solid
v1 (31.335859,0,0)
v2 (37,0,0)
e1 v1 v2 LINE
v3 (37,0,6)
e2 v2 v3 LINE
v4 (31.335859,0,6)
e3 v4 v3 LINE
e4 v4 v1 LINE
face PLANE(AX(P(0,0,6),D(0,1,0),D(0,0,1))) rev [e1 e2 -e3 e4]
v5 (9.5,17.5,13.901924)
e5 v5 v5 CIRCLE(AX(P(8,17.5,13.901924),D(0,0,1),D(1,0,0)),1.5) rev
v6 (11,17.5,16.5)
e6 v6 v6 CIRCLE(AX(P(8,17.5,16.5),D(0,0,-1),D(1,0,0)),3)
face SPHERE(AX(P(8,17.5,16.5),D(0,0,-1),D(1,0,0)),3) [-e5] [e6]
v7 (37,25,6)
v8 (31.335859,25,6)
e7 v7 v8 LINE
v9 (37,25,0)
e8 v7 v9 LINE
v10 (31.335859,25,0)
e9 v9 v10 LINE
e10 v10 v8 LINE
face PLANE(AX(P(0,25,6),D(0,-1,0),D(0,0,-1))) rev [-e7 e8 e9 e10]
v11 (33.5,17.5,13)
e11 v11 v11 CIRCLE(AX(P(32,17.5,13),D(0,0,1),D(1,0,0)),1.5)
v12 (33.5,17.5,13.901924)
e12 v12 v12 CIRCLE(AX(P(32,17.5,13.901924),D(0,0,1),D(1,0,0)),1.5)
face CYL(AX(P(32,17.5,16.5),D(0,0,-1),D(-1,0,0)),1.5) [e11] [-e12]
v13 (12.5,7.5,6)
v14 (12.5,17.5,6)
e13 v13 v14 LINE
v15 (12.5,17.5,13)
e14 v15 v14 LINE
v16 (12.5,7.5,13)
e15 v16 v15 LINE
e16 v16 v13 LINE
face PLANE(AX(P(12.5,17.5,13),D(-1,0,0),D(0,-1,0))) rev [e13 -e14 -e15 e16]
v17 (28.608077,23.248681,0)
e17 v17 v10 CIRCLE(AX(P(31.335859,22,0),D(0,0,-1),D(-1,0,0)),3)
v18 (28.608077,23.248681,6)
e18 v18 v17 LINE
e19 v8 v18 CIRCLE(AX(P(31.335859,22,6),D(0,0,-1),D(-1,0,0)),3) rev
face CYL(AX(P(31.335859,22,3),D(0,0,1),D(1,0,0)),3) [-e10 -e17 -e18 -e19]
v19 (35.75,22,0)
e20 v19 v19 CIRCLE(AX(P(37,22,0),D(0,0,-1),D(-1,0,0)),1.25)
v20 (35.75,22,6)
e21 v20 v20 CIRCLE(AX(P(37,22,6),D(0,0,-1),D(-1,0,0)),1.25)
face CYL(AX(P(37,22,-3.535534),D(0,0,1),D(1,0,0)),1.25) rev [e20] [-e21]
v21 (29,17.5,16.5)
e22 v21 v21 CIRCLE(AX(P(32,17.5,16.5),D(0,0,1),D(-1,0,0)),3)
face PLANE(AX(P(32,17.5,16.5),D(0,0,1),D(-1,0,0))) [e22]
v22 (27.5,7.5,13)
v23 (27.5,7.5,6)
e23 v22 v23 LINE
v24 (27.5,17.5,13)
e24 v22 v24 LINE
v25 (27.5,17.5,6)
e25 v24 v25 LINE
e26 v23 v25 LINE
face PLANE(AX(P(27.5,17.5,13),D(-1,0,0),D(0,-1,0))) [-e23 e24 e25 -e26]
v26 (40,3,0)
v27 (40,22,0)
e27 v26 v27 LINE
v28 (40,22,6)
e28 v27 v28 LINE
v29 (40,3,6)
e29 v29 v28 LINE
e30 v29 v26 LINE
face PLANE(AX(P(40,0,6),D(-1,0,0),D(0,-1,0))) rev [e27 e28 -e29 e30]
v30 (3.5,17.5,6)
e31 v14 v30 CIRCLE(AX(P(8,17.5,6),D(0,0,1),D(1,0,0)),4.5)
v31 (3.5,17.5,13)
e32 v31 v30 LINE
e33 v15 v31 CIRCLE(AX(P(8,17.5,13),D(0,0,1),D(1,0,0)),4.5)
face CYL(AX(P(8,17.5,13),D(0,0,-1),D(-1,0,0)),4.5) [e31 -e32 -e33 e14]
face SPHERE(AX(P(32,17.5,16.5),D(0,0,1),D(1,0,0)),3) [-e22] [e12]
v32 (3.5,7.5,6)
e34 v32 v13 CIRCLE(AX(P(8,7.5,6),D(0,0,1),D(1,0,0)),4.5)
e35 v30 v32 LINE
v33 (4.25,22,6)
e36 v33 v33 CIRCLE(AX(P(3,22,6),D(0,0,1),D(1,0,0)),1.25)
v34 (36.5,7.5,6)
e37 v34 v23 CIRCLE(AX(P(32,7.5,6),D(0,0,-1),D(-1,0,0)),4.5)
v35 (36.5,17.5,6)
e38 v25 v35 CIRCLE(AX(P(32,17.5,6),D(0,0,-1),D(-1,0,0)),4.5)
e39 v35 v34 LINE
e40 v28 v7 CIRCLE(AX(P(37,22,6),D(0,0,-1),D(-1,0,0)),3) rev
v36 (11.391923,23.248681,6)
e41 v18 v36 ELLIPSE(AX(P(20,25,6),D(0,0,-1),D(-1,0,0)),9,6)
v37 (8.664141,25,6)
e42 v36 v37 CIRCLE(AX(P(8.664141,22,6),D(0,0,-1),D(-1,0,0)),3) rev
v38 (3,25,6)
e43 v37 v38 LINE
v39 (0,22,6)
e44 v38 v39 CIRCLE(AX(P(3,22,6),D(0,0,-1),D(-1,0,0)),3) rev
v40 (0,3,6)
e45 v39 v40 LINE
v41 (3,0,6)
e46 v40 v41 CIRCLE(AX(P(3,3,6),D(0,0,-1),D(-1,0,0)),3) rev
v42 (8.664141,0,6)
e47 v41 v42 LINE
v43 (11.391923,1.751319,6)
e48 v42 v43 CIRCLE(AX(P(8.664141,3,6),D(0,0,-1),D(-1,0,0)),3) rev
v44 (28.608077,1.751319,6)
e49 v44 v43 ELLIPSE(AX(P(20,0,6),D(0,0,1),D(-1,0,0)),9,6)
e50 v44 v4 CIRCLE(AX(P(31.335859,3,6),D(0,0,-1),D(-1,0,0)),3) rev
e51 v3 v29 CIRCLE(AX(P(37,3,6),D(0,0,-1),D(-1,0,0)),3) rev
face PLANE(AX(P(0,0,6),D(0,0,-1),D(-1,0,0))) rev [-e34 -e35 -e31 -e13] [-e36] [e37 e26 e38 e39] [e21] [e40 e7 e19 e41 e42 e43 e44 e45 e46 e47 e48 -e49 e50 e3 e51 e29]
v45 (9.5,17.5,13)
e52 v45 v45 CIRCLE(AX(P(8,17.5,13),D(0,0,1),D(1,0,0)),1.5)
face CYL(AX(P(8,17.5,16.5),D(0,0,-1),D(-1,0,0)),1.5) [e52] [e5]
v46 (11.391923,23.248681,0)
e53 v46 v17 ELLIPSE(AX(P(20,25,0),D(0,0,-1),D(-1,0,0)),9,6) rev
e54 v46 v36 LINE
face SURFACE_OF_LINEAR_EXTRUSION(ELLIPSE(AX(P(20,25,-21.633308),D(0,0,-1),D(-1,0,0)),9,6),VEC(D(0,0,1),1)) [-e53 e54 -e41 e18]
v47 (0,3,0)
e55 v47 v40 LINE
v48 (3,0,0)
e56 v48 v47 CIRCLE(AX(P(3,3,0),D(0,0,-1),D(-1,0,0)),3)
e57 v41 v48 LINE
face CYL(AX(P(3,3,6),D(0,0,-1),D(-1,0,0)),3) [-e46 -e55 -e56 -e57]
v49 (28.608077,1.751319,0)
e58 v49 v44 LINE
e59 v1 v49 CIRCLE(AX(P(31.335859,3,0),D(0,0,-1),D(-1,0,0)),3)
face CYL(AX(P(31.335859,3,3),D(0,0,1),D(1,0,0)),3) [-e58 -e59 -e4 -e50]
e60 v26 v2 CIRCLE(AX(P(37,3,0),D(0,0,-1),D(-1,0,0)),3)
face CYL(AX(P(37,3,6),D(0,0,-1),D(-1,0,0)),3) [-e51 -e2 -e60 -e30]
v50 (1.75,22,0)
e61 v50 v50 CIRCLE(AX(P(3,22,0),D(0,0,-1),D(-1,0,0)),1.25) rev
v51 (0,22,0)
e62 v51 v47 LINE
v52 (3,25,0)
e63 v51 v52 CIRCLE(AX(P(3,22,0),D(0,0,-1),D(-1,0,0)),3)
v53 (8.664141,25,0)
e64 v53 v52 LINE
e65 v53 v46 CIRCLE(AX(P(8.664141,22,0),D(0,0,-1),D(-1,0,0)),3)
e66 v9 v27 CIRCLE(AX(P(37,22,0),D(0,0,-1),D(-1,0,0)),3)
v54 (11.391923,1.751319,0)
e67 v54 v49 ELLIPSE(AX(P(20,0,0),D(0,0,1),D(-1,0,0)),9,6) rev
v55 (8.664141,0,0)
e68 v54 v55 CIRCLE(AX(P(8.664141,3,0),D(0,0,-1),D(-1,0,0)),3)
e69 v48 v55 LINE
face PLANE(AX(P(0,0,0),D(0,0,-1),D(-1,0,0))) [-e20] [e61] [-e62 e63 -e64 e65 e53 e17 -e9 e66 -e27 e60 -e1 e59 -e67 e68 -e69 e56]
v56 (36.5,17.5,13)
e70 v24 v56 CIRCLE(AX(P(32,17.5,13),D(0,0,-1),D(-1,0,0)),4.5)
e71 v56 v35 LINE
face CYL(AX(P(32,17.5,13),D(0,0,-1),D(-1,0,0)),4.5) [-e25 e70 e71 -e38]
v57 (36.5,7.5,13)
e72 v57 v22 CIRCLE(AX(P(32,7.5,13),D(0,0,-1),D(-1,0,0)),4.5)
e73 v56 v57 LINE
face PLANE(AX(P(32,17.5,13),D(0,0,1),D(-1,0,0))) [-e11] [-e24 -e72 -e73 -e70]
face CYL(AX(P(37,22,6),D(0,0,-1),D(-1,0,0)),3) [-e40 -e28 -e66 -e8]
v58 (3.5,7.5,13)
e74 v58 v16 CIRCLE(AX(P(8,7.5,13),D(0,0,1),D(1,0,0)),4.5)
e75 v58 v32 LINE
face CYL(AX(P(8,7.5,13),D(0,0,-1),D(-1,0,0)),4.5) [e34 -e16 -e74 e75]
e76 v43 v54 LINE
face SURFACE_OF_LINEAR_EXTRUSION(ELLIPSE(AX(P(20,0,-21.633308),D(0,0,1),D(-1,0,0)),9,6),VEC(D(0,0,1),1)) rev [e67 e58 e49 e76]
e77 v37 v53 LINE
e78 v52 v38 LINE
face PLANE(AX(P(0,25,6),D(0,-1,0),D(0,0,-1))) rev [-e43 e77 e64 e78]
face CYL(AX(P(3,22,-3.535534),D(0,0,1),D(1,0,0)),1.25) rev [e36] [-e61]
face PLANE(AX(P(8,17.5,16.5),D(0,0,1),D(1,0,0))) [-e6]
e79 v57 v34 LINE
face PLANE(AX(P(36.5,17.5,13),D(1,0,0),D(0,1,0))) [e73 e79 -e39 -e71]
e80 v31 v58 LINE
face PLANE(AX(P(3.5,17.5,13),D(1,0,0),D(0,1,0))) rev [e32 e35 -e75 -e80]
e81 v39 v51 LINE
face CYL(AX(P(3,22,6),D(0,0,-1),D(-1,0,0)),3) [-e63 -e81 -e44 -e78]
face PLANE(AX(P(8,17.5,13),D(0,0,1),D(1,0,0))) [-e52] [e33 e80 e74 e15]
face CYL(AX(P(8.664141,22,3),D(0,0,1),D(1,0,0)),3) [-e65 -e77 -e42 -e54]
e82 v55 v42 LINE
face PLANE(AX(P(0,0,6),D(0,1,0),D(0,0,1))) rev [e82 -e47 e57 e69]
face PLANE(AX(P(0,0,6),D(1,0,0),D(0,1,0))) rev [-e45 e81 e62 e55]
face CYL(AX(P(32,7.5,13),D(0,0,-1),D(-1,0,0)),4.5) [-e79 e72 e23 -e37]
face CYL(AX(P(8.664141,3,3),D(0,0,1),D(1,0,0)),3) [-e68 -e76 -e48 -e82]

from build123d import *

# Parameters (mm, degrees)
SKIZZE1_W                       = 40
SKIZZE1_H                       = 25
AUFSATZ_LINEAR_AUSTRAGEN1_DEPTH = 6
AUFSATZ_LINEAR_AUSTRAGEN2_DEPTH = 7
SKIZZE3_R                       = 1.5
AUFSATZ_LINEAR_AUSTRAGEN3_DEPTH = 3.5
ROTATION1_ANGLE                 = 180
VERRUNDUNG1_R                   = 3
SKIZZE6_RX                      = 9
SKIZZE6_RY                      = 6
SCHNITT_LINEAR_AUSTRAGEN7_DEPTH = 6
VERRUNDUNG2_START               = -1
VERRUNDUNG2_DEPTH               = 8
VERRUNDUNG3_START               = -1
VERRUNDUNG3_DEPTH               = 8
SKIZZE7_R                       = 1.25
SCHNITT_LINEAR_AUSTRAGEN8_DEPTH = 6


with BuildPart() as part:
    # Skizze1 → Aufsatz-Linear austragen1 (new body)
    with BuildSketch(Plane.XY):
        with Locations((20, 12.5)):
            Rectangle(SKIZZE1_W, SKIZZE1_H)
    extrude(amount=AUFSATZ_LINEAR_AUSTRAGEN1_DEPTH)

    # Skizze2 → Aufsatz-Linear austragen2 (add)
    with BuildSketch(Plane.XY.offset(6)):
        with BuildLine():
            Line((12.5, 17.5), (12.5, 7.5))
            ThreePointArc((12.5, 7.5), (8, 3), (3.5, 7.5))
            Line((3.5, 7.5), (3.5, 17.5))
            ThreePointArc((3.5, 17.5), (8, 22), (12.5, 17.5))
        make_face()
    aufsatz_linear_austragen2 = extrude(amount=AUFSATZ_LINEAR_AUSTRAGEN2_DEPTH)

    # Spiegeln1: Aufsatz-Linear austragen2 across plane
    add(aufsatz_linear_austragen2.mirror(Plane.ZY.offset(-20)))

    # Skizze3 → Aufsatz-Linear austragen3 (add)
    with BuildSketch(Plane.XY.offset(13)):
        with Locations((8, 17.5)):
            Circle(SKIZZE3_R)
    aufsatz_linear_austragen3 = extrude(amount=AUFSATZ_LINEAR_AUSTRAGEN3_DEPTH)

    # Spiegeln2: Aufsatz-Linear austragen3 across plane
    add(aufsatz_linear_austragen3.mirror(Plane.ZY.offset(-20)))

    # Skizze4 → Rotation1 (revolve)
    with BuildSketch(Plane.XY.offset(16.5)):
        with BuildLine():
            Line((5, 17.5), (11, 17.5))
            ThreePointArc((11, 17.5), (8, 14.5), (5, 17.5))
        make_face()
    rotation1 = revolve(axis=Axis((5, 17.5, 16.5), (1, 0, 0)), revolution_arc=ROTATION1_ANGLE)

    # Spiegeln3: Rotation1 across plane
    add(rotation1.mirror(Plane.ZY.offset(-20)))

    # Verrundung1
    verrundung1_edges = [part.edges().sort_by_distance(p)[0] for p in [
        (0, 25, 3),
        (40, 25, 3),
        (40, 0, 3),
        (0, 0, 3),
    ]]
    fillet(verrundung1_edges, radius=VERRUNDUNG1_R)

    # Skizze6 → Schnitt-Linear austragen7 (cut)
    with BuildSketch(Plane.XY.offset(6)):
        with Locations(Location((20, 0), (0, 0, 180))):
            Ellipse(SKIZZE6_RX, SKIZZE6_RY)
    schnitt_linear_austragen7 = extrude(amount=-SCHNITT_LINEAR_AUSTRAGEN7_DEPTH, mode=Mode.SUBTRACT)

    # Verrundung2: read off the stored shape, not the designer's step
    # Verrundung2 outline → Verrundung2 (cut)
    with BuildSketch(Plane.XY.offset(VERRUNDUNG2_START)):
        with BuildLine():
            add(Edge.make_bspline(
                [(11.391923436, 1.751319232), (11, 0.89515019), (11, 0)],
                knots=[5.971053557, 5.971053557, 5.971053557, 6.283185307, 6.283185307, 6.283185307], degree=2, weights=[0.906728811, 0.94179941, 1]))
            ThreePointArc((11.391923436, 1.751319232), (10.28493687, 0.475515666), (8.664141124, 0))
            Line((8.664141124, 0), (11, 0))
        make_face()
        with BuildLine():
            ThreePointArc((31.335858876, 0), (29.71506313, 0.475515666), (28.608076564, 1.751319232))
            add(Edge.make_bspline(
                [(29, 0), (29, 0.89515019), (28.608076564, 1.751319232)],
                knots=[3.141592654, 3.141592654, 3.141592654, 3.453724403, 3.453724403, 3.453724403], degree=2, weights=[1, 0.94179941, 0.906728811]))
            Line((29, 0), (31.335858876, 0))
        make_face()
    extrude(amount=VERRUNDUNG2_DEPTH, mode=Mode.SUBTRACT)

    # Spiegeln5: Schnitt-Linear austragen7 across plane
    add(schnitt_linear_austragen7.mirror(Plane.ZX.offset(12.5)), mode=Mode.SUBTRACT)

    # Verrundung3: read off the stored shape, not the designer's step
    # Verrundung3 outline → Verrundung3 (cut)
    with BuildSketch(Plane.XY.offset(VERRUNDUNG3_START)):
        with BuildLine():
            ThreePointArc((8.664141124, 25), (10.28493687, 24.524484334), (11.391923436, 23.248680768))
            add(Edge.make_bspline(
                [(11.391923436, 23.248680768), (11, 24.10484981), (11, 25)],
                knots=[5.971053557, 5.971053557, 5.971053557, 6.283185307, 6.283185307, 6.283185307], degree=2, weights=[0.906728811, 0.94179941, 1]))
            Line((11, 25), (8.664141124, 25))
        make_face()
        with BuildLine():
            ThreePointArc((28.608076564, 23.248680768), (29.71506313, 24.524484334), (31.335858876, 25))
            Line((31.335858876, 25), (29, 25))
            add(Edge.make_bspline(
                [(29, 25), (29, 24.10484981), (28.608076564, 23.248680768)],
                knots=[3.141592654, 3.141592654, 3.141592654, 3.453724403, 3.453724403, 3.453724403], degree=2, weights=[1, 0.94179941, 0.906728811]))
        make_face()
    extrude(amount=VERRUNDUNG3_DEPTH, mode=Mode.SUBTRACT)

    # Skizze7 → Schnitt-Linear austragen8 (cut)
    with BuildSketch(Plane.XY.offset(6)):
        with Locations((3, 22)):
            Circle(SKIZZE7_R)
    schnitt_linear_austragen8 = extrude(amount=-SCHNITT_LINEAR_AUSTRAGEN8_DEPTH, mode=Mode.SUBTRACT)

    # Spiegeln6: Schnitt-Linear austragen8 across plane
    add(schnitt_linear_austragen8.mirror(Plane.ZY.offset(-20)), mode=Mode.SUBTRACT)


solid = part.part
